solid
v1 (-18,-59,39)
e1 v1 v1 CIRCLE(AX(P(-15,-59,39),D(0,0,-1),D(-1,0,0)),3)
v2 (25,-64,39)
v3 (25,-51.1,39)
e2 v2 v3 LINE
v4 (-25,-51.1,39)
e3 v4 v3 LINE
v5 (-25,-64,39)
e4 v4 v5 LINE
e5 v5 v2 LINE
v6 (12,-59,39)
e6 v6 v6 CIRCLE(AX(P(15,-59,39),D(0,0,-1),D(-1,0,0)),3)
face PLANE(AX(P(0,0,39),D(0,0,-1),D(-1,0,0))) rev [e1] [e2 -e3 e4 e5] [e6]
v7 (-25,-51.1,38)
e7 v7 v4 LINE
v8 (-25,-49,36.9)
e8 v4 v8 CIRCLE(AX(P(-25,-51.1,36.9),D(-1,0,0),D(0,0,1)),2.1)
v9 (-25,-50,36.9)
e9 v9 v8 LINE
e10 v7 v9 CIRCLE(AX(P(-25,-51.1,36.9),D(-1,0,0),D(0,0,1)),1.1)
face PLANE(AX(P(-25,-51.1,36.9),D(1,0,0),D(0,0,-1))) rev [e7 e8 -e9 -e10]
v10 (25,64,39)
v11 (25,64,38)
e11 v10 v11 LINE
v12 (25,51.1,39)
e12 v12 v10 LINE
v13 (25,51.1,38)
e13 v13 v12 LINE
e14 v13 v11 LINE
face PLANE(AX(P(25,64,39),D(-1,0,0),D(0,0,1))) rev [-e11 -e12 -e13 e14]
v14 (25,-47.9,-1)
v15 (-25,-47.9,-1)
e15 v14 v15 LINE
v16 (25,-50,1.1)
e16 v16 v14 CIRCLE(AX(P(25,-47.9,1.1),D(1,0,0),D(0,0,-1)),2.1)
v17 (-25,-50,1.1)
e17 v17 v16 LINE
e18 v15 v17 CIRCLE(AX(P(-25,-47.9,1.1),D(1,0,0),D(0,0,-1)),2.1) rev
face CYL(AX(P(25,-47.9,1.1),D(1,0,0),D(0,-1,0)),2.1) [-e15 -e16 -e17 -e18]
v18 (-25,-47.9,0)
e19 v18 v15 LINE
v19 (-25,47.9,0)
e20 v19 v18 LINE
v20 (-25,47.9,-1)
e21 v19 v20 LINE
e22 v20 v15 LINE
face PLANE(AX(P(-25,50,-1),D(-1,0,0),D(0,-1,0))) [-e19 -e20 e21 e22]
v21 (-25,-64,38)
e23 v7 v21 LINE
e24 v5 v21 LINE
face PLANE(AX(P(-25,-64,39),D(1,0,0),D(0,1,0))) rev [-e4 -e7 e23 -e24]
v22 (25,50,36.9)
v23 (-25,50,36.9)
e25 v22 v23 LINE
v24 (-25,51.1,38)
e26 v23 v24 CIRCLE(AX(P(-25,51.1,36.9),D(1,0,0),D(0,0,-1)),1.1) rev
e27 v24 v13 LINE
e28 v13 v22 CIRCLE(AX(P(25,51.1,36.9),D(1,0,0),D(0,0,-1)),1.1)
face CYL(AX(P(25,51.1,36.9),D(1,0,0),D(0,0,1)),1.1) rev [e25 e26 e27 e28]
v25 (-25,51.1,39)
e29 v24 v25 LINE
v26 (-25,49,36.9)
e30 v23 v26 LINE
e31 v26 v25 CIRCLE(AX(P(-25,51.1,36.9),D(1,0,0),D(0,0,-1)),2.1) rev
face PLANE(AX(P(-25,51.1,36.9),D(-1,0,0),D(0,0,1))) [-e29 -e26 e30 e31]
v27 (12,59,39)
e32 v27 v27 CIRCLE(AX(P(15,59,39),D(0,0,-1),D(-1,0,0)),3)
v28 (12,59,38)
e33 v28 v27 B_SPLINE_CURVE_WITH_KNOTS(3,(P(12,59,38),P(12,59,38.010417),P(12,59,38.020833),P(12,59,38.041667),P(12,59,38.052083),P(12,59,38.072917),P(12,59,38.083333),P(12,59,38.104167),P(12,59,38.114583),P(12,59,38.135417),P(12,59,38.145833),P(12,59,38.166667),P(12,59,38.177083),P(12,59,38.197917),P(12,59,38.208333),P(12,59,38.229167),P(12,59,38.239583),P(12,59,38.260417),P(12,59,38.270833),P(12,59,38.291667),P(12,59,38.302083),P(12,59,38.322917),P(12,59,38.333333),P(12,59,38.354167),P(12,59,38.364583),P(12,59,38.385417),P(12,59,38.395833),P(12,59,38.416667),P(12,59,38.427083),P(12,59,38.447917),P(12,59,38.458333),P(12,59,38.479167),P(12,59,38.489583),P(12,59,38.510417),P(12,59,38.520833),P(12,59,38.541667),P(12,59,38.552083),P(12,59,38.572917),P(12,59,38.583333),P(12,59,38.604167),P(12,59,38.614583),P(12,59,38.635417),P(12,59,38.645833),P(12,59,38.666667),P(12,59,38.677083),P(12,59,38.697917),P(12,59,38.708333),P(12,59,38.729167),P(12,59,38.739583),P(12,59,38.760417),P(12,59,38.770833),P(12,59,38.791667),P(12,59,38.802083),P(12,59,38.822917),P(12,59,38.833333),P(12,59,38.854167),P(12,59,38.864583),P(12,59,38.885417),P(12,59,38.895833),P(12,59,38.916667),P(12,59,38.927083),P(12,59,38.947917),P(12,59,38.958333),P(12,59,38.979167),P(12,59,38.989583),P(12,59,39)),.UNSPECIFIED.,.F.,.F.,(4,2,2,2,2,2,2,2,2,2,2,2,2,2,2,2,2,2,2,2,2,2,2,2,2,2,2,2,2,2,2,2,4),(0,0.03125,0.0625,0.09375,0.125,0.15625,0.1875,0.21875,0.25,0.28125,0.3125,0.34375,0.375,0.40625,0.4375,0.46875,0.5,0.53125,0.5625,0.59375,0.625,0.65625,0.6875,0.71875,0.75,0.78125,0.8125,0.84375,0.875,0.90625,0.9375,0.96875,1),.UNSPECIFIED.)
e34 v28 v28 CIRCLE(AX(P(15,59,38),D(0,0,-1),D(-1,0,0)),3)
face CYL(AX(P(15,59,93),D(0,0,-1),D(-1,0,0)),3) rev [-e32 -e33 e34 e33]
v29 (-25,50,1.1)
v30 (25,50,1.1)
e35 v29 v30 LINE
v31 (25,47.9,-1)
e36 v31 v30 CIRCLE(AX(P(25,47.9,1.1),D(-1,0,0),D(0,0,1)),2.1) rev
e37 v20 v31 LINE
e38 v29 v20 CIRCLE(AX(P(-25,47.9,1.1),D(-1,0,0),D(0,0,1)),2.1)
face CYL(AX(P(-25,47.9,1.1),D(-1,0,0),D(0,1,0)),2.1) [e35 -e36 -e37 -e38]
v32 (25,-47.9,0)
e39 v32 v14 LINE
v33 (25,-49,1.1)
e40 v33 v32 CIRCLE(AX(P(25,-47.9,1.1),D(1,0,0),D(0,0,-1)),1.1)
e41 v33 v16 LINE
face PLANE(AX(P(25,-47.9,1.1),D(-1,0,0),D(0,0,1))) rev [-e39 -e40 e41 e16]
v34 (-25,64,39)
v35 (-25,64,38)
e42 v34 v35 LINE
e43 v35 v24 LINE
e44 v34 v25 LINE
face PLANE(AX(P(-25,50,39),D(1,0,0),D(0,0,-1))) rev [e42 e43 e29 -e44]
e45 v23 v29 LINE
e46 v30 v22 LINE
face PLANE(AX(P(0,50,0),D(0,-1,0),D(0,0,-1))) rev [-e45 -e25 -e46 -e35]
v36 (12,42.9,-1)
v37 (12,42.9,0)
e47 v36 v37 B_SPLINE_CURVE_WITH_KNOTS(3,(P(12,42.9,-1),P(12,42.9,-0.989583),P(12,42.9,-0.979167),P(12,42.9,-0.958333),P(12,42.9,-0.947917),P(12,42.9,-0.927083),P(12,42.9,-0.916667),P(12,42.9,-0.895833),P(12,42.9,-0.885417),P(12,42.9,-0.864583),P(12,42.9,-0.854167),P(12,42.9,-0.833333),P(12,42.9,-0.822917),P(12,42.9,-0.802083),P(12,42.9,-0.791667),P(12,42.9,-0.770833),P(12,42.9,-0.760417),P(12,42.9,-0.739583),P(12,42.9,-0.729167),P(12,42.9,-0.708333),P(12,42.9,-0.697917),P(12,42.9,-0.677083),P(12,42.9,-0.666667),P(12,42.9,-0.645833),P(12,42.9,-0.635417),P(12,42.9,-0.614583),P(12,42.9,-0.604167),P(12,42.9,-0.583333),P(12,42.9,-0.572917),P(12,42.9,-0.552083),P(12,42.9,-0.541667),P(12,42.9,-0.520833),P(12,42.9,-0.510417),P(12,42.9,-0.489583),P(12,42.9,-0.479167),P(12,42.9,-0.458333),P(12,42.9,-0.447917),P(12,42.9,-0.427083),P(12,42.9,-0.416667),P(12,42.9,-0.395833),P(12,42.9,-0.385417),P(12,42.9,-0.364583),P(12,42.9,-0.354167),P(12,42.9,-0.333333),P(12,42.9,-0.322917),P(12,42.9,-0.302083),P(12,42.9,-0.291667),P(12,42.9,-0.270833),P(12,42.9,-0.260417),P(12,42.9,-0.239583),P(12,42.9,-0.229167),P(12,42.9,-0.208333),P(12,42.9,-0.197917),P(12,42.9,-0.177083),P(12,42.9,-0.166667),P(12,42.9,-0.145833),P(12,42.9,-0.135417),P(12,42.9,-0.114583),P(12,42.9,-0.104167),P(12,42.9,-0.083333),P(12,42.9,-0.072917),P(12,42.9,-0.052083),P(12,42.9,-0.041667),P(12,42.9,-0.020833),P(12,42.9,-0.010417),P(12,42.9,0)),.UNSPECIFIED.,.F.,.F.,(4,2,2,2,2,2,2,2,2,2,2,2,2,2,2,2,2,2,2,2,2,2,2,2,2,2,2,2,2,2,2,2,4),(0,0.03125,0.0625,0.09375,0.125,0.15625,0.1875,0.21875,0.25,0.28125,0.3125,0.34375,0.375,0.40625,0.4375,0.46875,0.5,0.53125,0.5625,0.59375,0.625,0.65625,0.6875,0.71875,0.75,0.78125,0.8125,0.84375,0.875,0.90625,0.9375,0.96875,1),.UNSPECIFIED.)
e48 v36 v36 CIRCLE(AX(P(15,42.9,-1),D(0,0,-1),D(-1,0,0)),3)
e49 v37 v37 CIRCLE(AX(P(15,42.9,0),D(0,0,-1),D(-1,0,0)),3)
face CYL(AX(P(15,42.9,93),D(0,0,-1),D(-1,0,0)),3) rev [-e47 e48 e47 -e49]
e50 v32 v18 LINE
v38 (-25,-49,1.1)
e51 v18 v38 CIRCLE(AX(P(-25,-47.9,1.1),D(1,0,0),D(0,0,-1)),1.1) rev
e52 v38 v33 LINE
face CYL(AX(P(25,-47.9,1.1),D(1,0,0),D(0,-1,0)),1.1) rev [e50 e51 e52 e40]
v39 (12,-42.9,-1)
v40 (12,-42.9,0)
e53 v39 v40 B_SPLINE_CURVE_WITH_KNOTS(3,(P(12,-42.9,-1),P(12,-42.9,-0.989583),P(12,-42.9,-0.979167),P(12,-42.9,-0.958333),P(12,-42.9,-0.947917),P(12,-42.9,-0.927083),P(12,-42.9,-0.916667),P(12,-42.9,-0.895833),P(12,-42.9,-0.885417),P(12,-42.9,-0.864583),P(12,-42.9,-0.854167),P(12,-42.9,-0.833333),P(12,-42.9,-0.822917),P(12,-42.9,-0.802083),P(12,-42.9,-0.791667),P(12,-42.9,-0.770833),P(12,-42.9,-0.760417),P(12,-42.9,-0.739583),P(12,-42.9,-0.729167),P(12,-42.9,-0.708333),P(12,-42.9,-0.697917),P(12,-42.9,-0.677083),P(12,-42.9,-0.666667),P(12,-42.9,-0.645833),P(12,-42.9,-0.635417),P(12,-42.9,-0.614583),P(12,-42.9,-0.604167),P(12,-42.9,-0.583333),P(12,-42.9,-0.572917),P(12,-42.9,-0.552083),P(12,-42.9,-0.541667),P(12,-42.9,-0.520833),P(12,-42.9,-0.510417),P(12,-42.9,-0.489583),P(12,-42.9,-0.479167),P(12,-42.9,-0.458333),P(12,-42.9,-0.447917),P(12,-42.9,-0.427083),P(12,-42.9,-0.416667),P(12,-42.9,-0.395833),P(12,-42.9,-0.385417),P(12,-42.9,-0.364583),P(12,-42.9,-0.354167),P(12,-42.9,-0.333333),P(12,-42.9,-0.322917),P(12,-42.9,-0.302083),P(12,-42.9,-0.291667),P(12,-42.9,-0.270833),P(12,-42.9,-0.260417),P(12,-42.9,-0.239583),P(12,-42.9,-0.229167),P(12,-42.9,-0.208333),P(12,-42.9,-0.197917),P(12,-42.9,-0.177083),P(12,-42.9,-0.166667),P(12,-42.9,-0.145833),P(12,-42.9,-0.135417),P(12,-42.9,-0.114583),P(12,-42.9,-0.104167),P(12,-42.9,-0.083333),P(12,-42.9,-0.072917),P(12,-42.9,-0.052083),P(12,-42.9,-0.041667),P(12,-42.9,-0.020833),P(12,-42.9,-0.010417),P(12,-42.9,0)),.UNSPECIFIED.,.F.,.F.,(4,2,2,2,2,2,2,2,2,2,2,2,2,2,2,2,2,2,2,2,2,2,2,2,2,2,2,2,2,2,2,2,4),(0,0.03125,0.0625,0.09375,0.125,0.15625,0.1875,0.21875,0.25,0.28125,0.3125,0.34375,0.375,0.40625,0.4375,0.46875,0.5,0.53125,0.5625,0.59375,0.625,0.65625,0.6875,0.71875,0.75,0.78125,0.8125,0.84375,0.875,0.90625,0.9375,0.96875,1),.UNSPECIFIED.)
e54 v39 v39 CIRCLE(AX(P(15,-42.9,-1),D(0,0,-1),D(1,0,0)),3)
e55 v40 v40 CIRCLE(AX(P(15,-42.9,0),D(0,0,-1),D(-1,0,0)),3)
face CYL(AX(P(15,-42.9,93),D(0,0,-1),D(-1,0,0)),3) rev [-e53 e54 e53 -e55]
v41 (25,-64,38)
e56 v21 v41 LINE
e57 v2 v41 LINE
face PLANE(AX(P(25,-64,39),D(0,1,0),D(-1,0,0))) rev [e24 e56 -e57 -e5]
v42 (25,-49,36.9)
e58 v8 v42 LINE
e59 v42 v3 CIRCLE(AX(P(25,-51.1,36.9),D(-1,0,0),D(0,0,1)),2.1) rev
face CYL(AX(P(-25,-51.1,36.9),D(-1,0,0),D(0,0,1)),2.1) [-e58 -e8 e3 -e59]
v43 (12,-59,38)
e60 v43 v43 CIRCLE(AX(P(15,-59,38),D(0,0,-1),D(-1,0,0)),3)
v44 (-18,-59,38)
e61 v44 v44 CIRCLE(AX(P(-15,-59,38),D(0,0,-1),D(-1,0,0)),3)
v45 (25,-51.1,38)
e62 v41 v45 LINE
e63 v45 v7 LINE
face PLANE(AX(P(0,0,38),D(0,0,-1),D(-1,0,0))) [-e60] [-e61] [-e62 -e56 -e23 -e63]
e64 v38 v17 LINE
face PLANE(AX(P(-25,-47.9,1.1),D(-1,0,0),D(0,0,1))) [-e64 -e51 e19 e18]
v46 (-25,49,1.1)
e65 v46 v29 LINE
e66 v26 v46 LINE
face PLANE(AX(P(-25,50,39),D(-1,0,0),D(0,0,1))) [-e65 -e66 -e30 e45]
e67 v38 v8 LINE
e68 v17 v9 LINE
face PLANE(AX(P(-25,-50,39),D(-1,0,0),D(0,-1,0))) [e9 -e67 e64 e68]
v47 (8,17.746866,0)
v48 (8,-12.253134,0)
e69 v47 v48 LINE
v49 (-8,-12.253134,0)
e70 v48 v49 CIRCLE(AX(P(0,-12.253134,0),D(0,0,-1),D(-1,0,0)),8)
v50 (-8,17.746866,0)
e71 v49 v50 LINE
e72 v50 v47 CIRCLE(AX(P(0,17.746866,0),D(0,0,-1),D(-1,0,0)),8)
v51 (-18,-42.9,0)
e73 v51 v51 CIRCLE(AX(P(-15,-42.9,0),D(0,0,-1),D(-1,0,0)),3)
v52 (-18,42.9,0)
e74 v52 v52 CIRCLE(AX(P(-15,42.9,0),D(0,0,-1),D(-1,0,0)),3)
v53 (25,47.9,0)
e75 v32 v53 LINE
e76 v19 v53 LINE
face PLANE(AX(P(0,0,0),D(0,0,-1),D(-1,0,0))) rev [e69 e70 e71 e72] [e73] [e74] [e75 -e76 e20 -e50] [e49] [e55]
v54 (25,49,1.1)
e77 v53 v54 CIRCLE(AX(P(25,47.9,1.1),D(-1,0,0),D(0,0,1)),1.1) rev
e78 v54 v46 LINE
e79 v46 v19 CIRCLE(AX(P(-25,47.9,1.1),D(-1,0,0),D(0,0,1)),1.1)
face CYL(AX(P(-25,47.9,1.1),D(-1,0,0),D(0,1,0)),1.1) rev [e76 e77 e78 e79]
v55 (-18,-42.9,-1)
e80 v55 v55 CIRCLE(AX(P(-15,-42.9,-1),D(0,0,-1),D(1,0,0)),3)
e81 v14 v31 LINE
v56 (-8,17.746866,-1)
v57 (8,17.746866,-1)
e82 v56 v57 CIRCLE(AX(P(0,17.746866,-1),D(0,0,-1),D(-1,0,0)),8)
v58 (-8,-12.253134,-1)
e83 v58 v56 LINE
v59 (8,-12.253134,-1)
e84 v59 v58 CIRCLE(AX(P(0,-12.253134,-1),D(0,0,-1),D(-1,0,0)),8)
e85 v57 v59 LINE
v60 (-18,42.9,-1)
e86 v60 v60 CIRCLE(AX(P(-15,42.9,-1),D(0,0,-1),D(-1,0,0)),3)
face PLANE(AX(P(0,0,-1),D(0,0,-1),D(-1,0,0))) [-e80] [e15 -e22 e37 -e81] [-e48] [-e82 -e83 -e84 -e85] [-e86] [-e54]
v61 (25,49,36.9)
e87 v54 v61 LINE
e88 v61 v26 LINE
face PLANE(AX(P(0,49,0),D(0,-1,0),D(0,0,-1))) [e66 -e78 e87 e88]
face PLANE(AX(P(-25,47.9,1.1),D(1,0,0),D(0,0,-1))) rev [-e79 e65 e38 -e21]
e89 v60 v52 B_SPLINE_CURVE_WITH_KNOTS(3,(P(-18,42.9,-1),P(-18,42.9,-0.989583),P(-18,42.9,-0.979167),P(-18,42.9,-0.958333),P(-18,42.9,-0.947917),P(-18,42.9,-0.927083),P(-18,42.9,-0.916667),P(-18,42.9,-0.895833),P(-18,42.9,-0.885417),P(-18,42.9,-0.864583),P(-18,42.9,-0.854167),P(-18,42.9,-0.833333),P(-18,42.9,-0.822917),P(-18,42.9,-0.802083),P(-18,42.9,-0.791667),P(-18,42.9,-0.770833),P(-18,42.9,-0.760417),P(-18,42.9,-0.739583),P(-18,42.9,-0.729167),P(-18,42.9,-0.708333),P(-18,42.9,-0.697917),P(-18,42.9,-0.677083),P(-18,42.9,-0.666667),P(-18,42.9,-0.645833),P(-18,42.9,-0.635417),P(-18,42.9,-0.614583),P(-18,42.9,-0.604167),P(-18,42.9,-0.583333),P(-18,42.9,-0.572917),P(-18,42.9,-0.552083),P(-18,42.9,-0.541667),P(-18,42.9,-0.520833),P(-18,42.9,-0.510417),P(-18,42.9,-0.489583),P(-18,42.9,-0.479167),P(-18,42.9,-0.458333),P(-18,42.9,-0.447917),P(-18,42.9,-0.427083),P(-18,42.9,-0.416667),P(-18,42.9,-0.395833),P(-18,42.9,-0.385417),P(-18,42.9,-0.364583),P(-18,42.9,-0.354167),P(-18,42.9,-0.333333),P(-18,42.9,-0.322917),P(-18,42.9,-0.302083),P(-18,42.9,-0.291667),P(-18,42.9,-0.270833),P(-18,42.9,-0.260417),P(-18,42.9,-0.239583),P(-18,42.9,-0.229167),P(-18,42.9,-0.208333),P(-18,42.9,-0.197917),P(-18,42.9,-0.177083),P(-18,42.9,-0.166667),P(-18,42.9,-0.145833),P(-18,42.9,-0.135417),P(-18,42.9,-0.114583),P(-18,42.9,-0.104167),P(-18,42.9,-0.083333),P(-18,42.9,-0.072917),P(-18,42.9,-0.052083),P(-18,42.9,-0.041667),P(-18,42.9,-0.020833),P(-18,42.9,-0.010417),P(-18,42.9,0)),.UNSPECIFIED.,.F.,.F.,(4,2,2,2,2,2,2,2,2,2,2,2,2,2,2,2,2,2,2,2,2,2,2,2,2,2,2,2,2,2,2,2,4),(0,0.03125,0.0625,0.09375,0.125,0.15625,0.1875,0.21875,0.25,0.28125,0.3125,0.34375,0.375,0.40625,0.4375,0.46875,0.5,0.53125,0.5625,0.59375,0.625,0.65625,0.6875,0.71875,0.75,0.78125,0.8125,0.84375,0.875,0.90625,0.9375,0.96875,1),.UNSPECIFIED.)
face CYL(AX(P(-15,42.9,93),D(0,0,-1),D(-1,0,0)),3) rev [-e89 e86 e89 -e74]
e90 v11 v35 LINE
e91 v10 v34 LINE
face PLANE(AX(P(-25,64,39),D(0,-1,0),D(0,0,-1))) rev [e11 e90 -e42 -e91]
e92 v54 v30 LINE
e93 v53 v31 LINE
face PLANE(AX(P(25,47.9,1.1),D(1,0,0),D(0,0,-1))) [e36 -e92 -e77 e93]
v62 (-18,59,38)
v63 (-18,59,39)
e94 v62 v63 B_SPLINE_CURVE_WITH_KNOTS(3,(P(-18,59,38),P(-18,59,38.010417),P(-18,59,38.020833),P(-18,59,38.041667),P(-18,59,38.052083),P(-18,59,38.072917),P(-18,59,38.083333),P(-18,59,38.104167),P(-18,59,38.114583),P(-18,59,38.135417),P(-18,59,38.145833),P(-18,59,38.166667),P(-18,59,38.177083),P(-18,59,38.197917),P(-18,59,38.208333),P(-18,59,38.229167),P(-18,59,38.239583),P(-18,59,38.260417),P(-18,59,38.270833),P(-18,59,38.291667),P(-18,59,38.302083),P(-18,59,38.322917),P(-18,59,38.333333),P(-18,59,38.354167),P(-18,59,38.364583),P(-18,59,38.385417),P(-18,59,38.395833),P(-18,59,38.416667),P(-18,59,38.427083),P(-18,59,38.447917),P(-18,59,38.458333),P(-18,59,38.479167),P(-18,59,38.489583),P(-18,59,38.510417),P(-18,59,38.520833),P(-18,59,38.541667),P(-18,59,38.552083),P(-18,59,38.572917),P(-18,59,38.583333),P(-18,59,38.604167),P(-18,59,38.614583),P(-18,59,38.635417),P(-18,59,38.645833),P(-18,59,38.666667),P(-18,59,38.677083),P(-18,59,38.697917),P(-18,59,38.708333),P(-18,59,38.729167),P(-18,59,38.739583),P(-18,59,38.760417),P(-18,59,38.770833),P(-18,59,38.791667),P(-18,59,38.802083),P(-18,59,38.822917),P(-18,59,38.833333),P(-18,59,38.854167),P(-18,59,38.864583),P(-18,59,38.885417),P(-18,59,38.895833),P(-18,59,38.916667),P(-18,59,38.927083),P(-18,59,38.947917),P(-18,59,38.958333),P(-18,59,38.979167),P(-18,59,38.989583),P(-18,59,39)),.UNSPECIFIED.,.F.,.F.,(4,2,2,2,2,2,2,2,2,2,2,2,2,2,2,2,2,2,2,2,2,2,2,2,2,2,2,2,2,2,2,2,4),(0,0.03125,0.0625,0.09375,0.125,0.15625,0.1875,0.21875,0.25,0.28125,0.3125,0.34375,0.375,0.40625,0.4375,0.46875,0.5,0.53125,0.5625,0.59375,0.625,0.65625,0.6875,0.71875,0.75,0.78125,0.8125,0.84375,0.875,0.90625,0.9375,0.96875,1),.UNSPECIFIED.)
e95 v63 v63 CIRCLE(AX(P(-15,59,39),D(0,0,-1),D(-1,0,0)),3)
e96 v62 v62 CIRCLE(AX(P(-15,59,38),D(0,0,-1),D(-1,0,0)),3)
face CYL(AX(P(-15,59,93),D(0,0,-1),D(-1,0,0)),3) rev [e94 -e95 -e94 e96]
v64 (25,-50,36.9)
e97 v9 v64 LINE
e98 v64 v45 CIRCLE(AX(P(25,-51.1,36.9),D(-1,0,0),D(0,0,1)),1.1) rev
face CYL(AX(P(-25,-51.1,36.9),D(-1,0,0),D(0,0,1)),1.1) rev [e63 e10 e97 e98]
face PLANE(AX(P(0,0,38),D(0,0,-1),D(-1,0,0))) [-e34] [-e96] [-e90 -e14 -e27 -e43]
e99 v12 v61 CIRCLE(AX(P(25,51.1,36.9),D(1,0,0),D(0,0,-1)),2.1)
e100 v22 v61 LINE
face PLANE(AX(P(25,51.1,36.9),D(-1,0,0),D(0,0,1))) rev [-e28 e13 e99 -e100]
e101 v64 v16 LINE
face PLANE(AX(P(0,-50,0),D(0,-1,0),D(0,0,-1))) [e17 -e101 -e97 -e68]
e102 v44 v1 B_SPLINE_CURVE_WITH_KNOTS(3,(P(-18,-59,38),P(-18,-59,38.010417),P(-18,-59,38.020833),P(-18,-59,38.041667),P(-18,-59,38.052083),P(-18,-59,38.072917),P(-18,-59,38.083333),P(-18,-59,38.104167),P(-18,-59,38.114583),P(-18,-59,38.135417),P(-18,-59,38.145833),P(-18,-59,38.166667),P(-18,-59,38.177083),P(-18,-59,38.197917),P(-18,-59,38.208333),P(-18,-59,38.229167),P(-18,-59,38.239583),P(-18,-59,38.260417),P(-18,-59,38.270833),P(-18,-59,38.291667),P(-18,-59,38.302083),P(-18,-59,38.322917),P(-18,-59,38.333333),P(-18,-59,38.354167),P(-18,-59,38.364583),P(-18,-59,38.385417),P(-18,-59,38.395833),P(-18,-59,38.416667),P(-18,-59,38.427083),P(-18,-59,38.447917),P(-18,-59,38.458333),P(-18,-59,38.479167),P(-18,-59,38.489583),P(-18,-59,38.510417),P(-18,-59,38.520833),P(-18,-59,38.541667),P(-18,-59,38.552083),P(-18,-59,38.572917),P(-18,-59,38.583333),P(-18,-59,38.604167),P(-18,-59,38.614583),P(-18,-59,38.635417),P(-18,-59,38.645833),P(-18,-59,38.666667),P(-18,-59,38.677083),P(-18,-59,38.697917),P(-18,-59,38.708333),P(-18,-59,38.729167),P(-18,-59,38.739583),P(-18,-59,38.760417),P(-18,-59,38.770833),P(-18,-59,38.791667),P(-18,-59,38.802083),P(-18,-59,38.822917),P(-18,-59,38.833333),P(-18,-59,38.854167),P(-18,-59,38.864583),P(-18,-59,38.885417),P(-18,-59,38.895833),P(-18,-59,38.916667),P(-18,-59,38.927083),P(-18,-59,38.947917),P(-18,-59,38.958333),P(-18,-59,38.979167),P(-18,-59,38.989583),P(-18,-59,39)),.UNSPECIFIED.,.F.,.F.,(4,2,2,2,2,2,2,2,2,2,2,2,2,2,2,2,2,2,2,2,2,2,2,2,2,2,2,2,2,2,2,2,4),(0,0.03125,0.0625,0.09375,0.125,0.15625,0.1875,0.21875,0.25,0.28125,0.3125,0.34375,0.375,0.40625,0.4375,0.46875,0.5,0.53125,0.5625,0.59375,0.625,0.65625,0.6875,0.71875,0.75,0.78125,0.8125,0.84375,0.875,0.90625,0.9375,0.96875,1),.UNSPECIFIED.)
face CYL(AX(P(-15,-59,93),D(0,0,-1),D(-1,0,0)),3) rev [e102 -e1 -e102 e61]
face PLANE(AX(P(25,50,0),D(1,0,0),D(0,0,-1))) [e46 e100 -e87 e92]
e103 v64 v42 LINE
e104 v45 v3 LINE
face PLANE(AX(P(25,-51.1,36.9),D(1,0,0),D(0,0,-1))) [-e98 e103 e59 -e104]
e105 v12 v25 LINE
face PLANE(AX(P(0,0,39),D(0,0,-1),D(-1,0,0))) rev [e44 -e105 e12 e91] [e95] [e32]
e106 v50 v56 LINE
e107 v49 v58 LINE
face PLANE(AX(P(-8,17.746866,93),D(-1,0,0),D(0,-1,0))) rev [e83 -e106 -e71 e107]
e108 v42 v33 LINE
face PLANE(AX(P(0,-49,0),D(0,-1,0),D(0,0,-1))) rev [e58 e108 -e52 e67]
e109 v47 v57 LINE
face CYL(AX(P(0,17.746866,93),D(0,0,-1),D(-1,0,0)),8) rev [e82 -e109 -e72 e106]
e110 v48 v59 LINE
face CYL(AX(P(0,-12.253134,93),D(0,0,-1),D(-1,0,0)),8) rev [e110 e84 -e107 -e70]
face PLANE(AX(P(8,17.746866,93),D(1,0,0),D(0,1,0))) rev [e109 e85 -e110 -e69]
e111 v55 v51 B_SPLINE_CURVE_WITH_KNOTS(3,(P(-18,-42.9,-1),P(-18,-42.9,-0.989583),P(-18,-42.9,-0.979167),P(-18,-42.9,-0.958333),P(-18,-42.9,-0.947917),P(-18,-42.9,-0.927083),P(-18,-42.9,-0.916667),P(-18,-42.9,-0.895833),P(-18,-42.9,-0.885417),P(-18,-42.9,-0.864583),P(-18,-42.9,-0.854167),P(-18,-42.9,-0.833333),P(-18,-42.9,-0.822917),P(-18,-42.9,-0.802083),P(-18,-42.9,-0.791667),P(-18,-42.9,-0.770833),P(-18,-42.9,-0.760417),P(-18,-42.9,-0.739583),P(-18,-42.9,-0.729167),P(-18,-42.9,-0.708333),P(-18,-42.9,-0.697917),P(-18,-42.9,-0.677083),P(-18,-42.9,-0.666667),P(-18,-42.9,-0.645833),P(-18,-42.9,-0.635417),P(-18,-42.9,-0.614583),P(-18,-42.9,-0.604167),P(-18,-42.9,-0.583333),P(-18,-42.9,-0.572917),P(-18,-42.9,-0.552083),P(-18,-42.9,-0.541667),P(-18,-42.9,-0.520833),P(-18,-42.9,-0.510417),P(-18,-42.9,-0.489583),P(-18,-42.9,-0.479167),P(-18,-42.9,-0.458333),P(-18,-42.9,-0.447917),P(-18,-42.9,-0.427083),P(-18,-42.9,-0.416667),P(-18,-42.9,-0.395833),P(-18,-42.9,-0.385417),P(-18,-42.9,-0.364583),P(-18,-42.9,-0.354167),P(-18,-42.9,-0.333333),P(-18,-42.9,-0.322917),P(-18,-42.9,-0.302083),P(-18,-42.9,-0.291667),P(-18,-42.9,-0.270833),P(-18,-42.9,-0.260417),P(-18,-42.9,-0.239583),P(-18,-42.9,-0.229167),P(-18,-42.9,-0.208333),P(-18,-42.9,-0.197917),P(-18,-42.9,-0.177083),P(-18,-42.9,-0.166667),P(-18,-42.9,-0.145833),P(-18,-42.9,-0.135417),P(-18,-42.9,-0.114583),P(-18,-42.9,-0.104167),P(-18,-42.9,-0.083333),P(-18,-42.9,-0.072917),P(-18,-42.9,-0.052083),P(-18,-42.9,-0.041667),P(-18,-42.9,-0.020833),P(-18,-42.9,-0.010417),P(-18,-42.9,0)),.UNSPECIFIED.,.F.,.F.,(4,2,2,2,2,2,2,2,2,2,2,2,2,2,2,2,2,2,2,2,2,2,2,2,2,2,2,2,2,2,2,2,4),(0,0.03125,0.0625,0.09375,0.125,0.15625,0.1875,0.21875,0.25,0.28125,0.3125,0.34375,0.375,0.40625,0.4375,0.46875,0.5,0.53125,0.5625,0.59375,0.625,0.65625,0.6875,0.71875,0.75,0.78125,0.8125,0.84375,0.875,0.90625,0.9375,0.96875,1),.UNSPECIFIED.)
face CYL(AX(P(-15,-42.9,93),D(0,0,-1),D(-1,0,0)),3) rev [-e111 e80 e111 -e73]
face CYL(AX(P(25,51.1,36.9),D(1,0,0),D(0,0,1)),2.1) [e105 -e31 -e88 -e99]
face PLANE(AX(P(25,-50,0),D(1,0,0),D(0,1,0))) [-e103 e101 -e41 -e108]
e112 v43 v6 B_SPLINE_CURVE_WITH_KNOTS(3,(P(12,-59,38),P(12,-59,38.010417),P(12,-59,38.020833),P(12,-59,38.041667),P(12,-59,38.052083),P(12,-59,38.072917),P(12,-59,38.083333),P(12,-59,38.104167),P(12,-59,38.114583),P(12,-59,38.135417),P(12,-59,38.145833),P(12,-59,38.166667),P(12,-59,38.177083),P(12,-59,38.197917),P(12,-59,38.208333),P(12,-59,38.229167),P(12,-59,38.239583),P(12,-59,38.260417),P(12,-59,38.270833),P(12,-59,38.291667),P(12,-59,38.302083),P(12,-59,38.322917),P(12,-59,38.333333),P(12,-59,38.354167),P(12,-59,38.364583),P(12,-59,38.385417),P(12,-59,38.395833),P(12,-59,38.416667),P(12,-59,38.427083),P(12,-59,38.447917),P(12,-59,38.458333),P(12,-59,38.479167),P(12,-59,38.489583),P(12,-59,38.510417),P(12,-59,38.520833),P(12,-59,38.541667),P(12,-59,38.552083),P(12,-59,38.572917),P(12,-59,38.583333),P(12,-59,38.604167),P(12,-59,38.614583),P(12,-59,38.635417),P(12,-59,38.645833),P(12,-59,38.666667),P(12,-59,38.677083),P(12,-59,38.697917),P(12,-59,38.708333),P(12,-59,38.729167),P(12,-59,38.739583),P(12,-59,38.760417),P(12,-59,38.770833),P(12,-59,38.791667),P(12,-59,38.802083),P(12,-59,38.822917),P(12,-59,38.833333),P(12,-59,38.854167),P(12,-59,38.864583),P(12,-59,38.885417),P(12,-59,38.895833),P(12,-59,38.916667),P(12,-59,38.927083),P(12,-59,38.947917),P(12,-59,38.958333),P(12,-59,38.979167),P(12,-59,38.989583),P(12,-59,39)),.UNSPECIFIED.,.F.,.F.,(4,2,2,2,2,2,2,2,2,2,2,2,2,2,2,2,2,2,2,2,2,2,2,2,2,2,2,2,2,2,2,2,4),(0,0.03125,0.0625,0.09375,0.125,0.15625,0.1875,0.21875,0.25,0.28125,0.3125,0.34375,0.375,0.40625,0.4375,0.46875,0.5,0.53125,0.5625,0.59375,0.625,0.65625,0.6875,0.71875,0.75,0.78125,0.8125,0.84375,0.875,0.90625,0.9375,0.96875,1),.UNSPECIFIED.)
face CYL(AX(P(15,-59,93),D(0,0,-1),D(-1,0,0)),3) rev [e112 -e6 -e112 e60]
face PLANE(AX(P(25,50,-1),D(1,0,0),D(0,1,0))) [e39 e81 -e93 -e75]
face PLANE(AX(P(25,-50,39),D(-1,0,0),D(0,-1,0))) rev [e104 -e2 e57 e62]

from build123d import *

# Parameters (mm, degrees)
SKETCH3_W                      = 50
SKETCH3_H                      = 100
BASE_FLANGE1_DEPTH             = 1
EDGE_FLANGE1_STRIP_W           = 6.2
EDGE_FLANGE1_STRIP_H           = 1
EDGE_FLANGE1_STRIP_CUT_DEPTH   = 50
EDGE_FLANGE1_STRIP_2_W         = 6.2
EDGE_FLANGE1_STRIP_2_H         = 1
EDGE_FLANGE1_STRIP_CUT_2_DEPTH = 50
EDGE_FLANGE1_DEPTH             = 50
EDGE_FLANGE1_BEND_DEPTH        = 50
EDGE_FLANGE2_STRIP_W           = 6.2
EDGE_FLANGE2_STRIP_H           = 1
EDGE_FLANGE2_STRIP_CUT_DEPTH   = 50
EDGE_FLANGE2_STRIP_2_W         = 6.2
EDGE_FLANGE2_STRIP_2_H         = 1
EDGE_FLANGE2_STRIP_CUT_2_DEPTH = 50
EDGE_FLANGE2_DEPTH             = 50
EDGE_FLANGE2_BEND_DEPTH        = 50
SKETCH20_R                     = 3
CUT_EXTRUDE1_DEPTH             = 94


# Sheet-metal steps are written as plain solids
with BuildPart() as part:
    # Sketch3 → Base-Flange1 (new body)
    with BuildSketch(Plane.XY):
        Rectangle(SKETCH3_W, SKETCH3_H)
    extrude(amount=-BASE_FLANGE1_DEPTH)

    # Edge-Flange1 strip (across the edge) → Edge-Flange1 strip cut (cut)
    with BuildSketch(Plane(origin=(-25, -50, 0), x_dir=(0, 1, 0), z_dir=(1, 0, 0))):
        with Locations((-1, -0.5)):
            Rectangle(EDGE_FLANGE1_STRIP_W, EDGE_FLANGE1_STRIP_H)
    extrude(amount=EDGE_FLANGE1_STRIP_CUT_DEPTH, mode=Mode.SUBTRACT)

    # Edge-Flange1 strip 2 (across the edge) → Edge-Flange1 strip cut 2 (cut)
    with BuildSketch(Plane(origin=(25, 50, 0), x_dir=(0, -1, 0), z_dir=(-1, 0, 0))):
        with Locations((-1, -0.5)):
            Rectangle(EDGE_FLANGE1_STRIP_2_W, EDGE_FLANGE1_STRIP_2_H)
    extrude(amount=EDGE_FLANGE1_STRIP_CUT_2_DEPTH, mode=Mode.SUBTRACT)

    # Edge-Flange1 section (across the edge) → Edge-Flange1 (add)
    with BuildSketch(Plane(origin=(-25, -50, 0), x_dir=(0, 1, 0), z_dir=(1, 0, 0))):
        with BuildLine():
            Line((0, 1.1), (0, 39))
            Line((0, 39), (1, 39))
            Line((1, 39), (1, 1.1))
            ThreePointArc((1, 1.1), (1.322182541, 0.322182541), (2.1, 0))
            Line((2.1, 0), (2.1, -1))
            ThreePointArc((2.1, -1), (0.61507576, -0.38492424), (0, 1.1))
        make_face()
    extrude(amount=EDGE_FLANGE1_DEPTH)

    # Edge-Flange1 section 2 (across the edge) → Edge-Flange1 bend (add)
    with BuildSketch(Plane(origin=(25, 50, 0), x_dir=(0, -1, 0), z_dir=(-1, 0, 0))):
        with BuildLine():
            Line((0, 1.1), (0, 39))
            Line((0, 39), (1, 39))
            Line((1, 39), (1, 1.1))
            ThreePointArc((1, 1.1), (1.322182541, 0.322182541), (2.1, 0))
            Line((2.1, 0), (2.1, -1))
            ThreePointArc((2.1, -1), (0.61507576, -0.38492424), (0, 1.1))
        make_face()
    extrude(amount=EDGE_FLANGE1_BEND_DEPTH)

    # Edge-Flange2 strip (across the edge) → Edge-Flange2 strip cut (cut)
    with BuildSketch(Plane(origin=(25, -50, 39), x_dir=(0, 0, -1), z_dir=(-1, 0, 0))):
        with Locations((-1, -0.5)):
            Rectangle(EDGE_FLANGE2_STRIP_W, EDGE_FLANGE2_STRIP_H)
    extrude(amount=EDGE_FLANGE2_STRIP_CUT_DEPTH, mode=Mode.SUBTRACT)

    # Edge-Flange2 strip 2 (across the edge) → Edge-Flange2 strip cut 2 (cut)
    with BuildSketch(Plane(origin=(-25, 50, 39), x_dir=(0, 0, -1), z_dir=(1, 0, 0))):
        with Locations((-1, -0.5)):
            Rectangle(EDGE_FLANGE2_STRIP_2_W, EDGE_FLANGE2_STRIP_2_H)
    extrude(amount=EDGE_FLANGE2_STRIP_CUT_2_DEPTH, mode=Mode.SUBTRACT)

    # Edge-Flange2 section (across the edge) → Edge-Flange2 (add)
    with BuildSketch(Plane(origin=(25, -50, 39), x_dir=(0, 0, -1), z_dir=(-1, 0, 0))):
        with BuildLine():
            Line((0, 1.1), (0, 14))
            Line((0, 14), (1, 14))
            Line((1, 14), (1, 1.1))
            ThreePointArc((1, 1.1), (1.322182541, 0.322182541), (2.1, 0))
            Line((2.1, 0), (2.1, -1))
            ThreePointArc((2.1, -1), (0.61507576, -0.38492424), (0, 1.1))
        make_face()
    extrude(amount=EDGE_FLANGE2_DEPTH)

    # Edge-Flange2 section 2 (across the edge) → Edge-Flange2 bend (add)
    with BuildSketch(Plane(origin=(-25, 50, 39), x_dir=(0, 0, -1), z_dir=(1, 0, 0))):
        with BuildLine():
            Line((0, 1.1), (0, 14))
            Line((0, 14), (1, 14))
            Line((1, 14), (1, 1.1))
            ThreePointArc((1, 1.1), (1.322182541, 0.322182541), (2.1, 0))
            Line((2.1, 0), (2.1, -1))
            ThreePointArc((2.1, -1), (0.61507576, -0.38492424), (0, 1.1))
        make_face()
    extrude(amount=EDGE_FLANGE2_BEND_DEPTH)

    # Sketch20 → Cut-Extrude1 (cut)
    with BuildSketch(Plane(origin=(0, 0, -1), x_dir=(-1, 0, 0), z_dir=(0, 0, -1))):
        with Locations((15, 42.9)):
            Circle(SKETCH20_R)
        with Locations((-15, 42.9)):
            Circle(SKETCH20_R)
        with Locations((15, 59)):
            Circle(SKETCH20_R)
        with Locations((-15, 59)):
            Circle(SKETCH20_R)
        with Locations((-15, -59)):
            Circle(SKETCH20_R)
        with Locations((15, -59)):
            Circle(SKETCH20_R)
        with Locations((15, -42.9)):
            Circle(SKETCH20_R)
        with Locations((-15, -42.9)):
            Circle(SKETCH20_R)
        with BuildLine():
            Line((8, 17.746865737), (8, -12.253134263))
            ThreePointArc((8, -12.253134263), (0, -20.253134263), (-8, -12.253134263))
            Line((-8, -12.253134263), (-8, 17.746865737))
            ThreePointArc((-8, 17.746865737), (0, 25.746865737), (8, 17.746865737))
        make_face()
    extrude(amount=-CUT_EXTRUDE1_DEPTH, mode=Mode.SUBTRACT)


solid = part.part
